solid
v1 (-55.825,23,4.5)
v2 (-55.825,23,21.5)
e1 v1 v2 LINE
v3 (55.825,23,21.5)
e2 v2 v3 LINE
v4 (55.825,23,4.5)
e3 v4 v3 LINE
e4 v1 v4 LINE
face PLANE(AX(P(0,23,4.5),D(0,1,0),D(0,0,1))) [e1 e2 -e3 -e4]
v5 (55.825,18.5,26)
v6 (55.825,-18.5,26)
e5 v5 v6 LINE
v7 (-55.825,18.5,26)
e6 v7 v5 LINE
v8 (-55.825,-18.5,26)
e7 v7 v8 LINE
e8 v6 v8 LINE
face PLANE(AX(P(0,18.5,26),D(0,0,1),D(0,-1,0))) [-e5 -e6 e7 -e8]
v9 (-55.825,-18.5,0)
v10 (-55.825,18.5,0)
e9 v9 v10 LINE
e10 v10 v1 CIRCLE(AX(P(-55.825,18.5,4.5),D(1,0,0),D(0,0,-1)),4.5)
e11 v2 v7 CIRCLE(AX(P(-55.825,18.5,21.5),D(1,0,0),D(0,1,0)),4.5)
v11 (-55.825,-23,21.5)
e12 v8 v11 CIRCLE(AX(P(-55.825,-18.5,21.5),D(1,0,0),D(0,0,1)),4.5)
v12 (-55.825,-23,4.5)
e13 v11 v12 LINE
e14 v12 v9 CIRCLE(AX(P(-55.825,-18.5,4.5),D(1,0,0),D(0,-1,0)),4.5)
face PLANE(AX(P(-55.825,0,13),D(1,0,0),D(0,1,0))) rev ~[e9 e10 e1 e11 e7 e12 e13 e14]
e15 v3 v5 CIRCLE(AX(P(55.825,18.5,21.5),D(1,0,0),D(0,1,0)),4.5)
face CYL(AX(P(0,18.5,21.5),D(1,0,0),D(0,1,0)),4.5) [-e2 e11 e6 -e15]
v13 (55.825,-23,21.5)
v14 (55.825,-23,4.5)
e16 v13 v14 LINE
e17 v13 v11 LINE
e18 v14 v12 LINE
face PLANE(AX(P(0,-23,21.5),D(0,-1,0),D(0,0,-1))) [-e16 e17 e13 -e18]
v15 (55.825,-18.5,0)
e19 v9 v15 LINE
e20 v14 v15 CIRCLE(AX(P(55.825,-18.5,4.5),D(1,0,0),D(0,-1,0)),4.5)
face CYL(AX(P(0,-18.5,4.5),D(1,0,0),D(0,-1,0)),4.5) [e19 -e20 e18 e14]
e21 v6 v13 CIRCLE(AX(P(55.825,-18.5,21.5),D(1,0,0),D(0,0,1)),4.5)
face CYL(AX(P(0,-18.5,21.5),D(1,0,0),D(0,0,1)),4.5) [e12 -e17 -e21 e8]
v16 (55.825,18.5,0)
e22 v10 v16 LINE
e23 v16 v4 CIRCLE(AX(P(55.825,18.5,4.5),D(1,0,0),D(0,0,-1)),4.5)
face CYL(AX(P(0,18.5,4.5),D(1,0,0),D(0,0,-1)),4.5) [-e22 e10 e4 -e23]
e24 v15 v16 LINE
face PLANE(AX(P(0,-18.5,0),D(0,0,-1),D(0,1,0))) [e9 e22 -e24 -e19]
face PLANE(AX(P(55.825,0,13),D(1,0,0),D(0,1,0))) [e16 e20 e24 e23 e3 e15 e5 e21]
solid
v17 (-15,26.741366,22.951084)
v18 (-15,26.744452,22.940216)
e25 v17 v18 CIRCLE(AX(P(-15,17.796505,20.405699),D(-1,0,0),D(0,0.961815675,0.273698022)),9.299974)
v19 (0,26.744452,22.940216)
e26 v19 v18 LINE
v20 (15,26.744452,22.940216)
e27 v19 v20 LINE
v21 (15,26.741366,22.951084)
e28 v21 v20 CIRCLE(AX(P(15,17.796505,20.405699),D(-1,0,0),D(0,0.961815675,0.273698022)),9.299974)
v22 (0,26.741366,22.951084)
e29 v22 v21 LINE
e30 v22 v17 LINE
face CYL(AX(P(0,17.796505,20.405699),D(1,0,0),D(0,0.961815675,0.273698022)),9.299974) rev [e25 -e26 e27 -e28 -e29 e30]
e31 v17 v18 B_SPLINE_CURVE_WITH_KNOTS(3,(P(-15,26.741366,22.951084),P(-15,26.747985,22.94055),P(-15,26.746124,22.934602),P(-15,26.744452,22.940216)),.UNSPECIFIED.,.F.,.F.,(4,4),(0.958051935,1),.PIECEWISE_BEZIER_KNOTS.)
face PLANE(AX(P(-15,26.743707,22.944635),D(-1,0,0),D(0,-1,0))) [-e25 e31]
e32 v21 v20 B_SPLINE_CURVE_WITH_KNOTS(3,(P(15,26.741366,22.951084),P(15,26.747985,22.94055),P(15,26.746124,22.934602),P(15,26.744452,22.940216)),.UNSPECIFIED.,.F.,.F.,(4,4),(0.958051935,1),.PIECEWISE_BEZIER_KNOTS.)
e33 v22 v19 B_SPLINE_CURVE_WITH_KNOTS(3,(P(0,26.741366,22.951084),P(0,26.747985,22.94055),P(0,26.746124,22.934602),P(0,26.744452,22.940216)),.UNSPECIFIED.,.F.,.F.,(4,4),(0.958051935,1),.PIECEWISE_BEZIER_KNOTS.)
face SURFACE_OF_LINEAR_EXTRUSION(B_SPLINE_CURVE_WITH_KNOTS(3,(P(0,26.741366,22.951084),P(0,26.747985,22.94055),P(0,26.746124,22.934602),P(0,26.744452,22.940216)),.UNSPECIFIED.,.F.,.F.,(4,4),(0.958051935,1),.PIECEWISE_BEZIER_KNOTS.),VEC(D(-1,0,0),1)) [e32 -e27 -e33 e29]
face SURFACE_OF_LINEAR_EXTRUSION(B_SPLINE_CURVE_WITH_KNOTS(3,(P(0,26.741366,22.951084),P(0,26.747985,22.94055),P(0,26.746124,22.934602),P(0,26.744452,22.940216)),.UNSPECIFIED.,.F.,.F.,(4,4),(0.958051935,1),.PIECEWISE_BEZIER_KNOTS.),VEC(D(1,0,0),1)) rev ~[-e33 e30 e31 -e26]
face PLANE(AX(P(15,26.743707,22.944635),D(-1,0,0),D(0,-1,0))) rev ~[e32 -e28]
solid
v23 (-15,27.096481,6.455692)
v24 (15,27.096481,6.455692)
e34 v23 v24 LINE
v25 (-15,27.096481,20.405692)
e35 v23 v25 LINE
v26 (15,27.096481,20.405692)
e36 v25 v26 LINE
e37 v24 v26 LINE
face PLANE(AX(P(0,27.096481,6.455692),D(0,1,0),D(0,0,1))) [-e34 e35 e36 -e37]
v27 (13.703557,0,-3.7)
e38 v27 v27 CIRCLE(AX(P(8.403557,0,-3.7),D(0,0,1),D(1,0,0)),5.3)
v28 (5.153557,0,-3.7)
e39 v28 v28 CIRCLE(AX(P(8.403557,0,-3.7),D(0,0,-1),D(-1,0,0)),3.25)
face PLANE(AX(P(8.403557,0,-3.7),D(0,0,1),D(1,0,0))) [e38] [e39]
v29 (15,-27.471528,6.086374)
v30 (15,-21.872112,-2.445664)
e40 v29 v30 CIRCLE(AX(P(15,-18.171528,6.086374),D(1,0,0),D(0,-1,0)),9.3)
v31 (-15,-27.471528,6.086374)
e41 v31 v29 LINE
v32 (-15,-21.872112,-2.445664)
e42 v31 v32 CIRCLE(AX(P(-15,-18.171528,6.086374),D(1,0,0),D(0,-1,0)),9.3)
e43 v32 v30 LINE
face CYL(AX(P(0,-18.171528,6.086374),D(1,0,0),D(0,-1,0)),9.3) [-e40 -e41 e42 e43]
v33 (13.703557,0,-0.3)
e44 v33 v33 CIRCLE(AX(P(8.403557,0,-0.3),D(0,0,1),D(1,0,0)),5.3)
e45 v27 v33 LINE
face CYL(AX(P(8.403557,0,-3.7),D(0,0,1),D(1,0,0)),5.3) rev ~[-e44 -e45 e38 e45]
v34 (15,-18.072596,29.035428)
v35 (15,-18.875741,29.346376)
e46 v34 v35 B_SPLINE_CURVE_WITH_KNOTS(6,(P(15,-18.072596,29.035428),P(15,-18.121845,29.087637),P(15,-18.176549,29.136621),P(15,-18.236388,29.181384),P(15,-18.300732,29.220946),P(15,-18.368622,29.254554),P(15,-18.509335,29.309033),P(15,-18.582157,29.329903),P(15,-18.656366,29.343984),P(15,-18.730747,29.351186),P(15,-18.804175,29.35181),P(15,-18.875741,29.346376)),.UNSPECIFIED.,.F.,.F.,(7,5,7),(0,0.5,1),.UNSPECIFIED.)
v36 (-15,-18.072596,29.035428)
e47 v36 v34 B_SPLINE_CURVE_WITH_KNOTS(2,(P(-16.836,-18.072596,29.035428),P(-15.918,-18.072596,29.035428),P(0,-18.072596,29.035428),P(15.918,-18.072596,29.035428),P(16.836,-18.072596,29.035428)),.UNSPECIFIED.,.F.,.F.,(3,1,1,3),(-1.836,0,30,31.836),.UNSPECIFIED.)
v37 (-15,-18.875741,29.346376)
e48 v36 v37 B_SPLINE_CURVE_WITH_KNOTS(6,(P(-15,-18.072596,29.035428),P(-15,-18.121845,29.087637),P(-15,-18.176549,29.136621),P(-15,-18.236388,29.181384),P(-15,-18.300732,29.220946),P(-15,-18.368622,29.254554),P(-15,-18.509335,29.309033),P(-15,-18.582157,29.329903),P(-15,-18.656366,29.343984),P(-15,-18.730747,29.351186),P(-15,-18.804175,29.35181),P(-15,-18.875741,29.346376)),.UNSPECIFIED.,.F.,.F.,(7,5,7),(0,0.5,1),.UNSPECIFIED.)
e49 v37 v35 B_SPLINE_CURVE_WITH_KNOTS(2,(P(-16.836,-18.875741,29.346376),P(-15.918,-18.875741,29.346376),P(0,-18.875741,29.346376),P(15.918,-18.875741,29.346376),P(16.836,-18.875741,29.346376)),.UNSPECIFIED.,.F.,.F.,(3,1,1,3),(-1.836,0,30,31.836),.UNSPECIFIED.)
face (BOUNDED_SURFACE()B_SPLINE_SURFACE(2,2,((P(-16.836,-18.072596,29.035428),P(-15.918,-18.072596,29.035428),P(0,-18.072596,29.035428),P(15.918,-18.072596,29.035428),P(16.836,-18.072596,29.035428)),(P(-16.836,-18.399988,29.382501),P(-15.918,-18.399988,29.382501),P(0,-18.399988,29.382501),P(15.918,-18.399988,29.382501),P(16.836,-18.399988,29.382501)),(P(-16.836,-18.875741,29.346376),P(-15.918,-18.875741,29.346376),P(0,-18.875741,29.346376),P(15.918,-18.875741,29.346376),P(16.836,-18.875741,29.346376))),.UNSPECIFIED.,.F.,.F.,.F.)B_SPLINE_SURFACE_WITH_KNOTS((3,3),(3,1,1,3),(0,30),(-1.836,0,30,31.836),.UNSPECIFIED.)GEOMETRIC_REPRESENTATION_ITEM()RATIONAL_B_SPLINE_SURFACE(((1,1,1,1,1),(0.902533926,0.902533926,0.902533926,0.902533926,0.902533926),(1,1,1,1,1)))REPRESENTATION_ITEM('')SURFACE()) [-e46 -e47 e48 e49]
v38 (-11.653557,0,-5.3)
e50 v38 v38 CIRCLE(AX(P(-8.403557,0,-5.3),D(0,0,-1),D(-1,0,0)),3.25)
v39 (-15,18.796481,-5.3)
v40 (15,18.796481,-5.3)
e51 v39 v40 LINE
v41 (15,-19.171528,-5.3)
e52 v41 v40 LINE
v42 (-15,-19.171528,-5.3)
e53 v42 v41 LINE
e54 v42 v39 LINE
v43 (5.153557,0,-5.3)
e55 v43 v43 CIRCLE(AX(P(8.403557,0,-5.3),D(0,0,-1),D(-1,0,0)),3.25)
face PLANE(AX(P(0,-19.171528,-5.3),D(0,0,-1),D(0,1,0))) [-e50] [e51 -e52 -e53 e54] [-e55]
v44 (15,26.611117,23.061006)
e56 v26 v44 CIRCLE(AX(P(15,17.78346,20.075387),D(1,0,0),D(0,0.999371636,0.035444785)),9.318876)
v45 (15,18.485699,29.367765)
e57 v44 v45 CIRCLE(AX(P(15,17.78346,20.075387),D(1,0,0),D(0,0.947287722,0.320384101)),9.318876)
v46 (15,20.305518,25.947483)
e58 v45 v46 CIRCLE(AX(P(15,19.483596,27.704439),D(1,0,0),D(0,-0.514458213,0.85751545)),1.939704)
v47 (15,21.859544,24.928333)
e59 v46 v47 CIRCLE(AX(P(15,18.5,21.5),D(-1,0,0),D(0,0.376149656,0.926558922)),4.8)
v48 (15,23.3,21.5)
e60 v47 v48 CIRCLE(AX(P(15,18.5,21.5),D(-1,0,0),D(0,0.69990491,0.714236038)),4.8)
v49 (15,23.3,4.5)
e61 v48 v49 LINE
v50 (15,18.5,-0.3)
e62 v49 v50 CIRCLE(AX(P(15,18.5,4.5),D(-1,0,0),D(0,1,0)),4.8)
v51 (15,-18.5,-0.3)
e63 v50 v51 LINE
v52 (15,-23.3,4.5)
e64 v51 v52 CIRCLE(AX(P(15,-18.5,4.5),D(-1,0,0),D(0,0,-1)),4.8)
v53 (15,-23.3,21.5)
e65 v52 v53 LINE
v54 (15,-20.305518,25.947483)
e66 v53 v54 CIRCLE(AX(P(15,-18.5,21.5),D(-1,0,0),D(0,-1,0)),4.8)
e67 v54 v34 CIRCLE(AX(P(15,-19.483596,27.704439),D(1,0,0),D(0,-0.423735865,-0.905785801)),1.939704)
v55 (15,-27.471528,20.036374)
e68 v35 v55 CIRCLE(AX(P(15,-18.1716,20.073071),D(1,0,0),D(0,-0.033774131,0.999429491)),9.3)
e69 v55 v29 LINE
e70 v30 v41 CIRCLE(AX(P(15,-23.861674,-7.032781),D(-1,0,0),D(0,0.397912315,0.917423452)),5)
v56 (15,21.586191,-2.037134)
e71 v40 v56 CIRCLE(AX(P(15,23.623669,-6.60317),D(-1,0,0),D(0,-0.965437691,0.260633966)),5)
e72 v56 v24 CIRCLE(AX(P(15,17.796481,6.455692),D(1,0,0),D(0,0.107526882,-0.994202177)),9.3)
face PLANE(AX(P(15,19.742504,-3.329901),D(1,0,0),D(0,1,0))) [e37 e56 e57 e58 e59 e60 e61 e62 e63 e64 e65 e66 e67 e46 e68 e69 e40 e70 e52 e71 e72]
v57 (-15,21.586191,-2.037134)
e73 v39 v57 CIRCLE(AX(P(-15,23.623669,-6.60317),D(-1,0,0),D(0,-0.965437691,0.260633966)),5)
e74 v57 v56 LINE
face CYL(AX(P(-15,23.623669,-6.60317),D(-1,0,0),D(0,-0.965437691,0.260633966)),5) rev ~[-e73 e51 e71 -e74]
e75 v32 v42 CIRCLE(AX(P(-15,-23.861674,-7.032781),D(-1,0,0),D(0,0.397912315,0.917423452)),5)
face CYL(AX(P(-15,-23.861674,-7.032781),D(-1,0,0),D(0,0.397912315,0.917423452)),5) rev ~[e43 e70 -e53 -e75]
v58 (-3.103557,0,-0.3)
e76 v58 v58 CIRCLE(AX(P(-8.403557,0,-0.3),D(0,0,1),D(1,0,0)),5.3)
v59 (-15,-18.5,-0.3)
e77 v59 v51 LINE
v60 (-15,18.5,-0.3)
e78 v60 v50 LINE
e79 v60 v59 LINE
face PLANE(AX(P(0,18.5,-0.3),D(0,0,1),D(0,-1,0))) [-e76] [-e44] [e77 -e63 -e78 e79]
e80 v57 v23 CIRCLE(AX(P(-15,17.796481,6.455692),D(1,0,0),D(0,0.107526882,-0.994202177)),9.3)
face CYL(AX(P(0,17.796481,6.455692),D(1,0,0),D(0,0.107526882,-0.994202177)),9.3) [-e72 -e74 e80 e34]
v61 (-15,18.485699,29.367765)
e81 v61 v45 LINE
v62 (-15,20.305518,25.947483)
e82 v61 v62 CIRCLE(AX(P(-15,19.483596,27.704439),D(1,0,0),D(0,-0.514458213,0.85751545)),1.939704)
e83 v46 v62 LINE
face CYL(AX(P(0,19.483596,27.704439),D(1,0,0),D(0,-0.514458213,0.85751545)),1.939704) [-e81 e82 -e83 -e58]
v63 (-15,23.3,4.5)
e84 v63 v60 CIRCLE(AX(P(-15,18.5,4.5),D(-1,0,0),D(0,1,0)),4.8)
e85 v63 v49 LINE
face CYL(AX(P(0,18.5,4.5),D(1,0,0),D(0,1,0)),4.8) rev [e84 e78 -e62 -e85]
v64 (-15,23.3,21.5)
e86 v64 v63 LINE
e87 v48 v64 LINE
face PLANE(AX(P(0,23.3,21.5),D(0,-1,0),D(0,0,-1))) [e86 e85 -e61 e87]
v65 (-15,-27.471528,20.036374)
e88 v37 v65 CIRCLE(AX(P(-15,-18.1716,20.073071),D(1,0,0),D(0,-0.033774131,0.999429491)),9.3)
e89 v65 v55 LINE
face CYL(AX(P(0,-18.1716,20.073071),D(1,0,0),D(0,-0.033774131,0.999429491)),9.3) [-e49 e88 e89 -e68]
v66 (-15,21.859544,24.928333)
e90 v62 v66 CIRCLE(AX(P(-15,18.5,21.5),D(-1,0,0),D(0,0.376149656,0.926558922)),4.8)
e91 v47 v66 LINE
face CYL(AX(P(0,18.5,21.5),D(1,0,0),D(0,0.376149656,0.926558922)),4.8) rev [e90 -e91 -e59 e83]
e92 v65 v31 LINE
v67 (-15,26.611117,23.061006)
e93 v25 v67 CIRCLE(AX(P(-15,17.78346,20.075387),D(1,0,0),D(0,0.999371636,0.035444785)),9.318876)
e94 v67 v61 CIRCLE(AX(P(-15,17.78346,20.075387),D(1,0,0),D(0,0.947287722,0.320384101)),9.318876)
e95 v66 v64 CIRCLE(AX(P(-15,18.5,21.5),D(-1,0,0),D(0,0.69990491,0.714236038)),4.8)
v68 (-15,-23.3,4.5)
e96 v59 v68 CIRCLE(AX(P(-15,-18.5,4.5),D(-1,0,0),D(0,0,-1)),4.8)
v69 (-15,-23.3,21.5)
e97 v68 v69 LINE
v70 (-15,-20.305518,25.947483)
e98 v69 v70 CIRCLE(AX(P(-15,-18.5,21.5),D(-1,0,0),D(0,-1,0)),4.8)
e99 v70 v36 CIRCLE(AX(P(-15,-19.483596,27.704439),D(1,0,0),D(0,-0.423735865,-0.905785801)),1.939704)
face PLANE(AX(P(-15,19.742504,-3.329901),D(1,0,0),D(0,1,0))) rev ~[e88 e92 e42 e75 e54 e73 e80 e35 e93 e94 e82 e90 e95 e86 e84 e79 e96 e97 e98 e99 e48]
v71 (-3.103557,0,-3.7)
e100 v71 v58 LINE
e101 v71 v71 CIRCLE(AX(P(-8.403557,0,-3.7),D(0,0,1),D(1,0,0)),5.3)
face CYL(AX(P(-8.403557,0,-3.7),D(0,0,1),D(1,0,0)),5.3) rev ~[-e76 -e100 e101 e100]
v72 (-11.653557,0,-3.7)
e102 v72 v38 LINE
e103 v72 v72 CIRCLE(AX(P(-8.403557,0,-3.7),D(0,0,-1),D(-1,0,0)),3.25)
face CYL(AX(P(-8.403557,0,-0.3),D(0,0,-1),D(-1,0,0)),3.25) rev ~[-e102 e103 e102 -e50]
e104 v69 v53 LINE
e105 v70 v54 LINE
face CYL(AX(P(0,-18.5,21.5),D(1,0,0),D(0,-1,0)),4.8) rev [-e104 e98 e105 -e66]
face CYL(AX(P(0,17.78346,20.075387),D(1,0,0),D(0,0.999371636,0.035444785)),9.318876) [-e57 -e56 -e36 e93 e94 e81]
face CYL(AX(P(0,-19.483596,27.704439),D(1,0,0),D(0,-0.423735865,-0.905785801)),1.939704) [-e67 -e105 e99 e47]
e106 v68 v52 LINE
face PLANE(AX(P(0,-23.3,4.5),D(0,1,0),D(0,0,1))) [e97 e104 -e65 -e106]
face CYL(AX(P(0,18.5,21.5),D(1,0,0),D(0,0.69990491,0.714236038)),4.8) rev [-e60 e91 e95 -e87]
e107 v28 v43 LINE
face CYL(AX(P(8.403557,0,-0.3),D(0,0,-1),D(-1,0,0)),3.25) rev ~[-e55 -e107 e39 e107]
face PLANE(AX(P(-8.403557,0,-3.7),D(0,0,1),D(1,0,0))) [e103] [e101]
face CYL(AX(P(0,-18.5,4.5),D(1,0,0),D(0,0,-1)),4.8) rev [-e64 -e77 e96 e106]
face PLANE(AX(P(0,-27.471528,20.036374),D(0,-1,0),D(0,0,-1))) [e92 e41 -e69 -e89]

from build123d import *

# Parameters (mm, degrees)
F1_DEPTH       = 55.825
F3_DEPTH       = 15
F5_D           = 6.5
F5_CBORE_D     = 10.6
F5_CBORE_DEPTH = 3.4
F6_T1_DEPTH    = 30
F7_R           = 1


# Not quite as in the source:
# - a fillet or chamfer that OpenCascade refuses, or shapes differently, is made with other operations: its cross-section is extruded or revolved along the edge and cut away or added


with BuildPart() as f1:
    # F0 (on Right) → F1 (new body, symmetric)
    with BuildSketch(Plane.YZ):
        with BuildLine():
            ThreePointArc((-23, 4.5), (-21.6819805153, 1.3180194847), (-18.5, 0))
            Line((-18.5, 0), (18.5, 0))
            ThreePointArc((18.5, 0), (21.6819805153, 1.3180194847), (23, 4.5))
            Line((23, 4.5), (23, 21.5))
            ThreePointArc((23, 21.5), (21.6819805153, 24.6819805153), (18.5, 26))
            Line((18.5, 26), (-18.5, 26))
            ThreePointArc((-18.5, 26), (-21.6819805153, 24.6819805153), (-23, 21.5))
            Line((-23, 21.5), (-23, 4.5))
        make_face()
    extrude(amount=F1_DEPTH, both=True)


with BuildPart() as f3:
    # F2 (on Right) → F3 (new body, symmetric)
    with BuildSketch(Plane.YZ):
        with BuildLine():
            add(Edge.make_bspline(
                [(26.7413663264, 22.9510836938), (26.7479851877, 22.9405500746), (26.746124128, 22.9346023266), (26.7444516472, 22.9402163477)],
                knots=[0.9580519354, 0.9580519354, 0.9580519354, 0.9580519354, 1, 1, 1, 1], degree=3))
            ThreePointArc((26.7413663264, 22.9510836938), (26.7429106369, 22.9456504892), (26.7444516472, 22.9402163477))
        make_face()
    extrude(amount=F3_DEPTH, both=True)


with BuildPart() as f3b:
    # F2 (on Right) → F3, piece 2 (new body, symmetric)
    with BuildSketch(Plane.YZ):
        with BuildLine():
            Line((23.3, 21.5), (23.3, 4.5))
            ThreePointArc((23.3, 4.5), (21.8941125497, 1.1058874503), (18.5, -0.3))
            Line((18.5, -0.3), (-18.5, -0.3))
            ThreePointArc((-18.5, -0.3), (-21.8941125497, 1.1058874503), (-23.3, 4.5))
            Line((-23.3, 4.5), (-23.3, 21.5))
            ThreePointArc((-23.3, 21.5), (-22.4816132456, 24.1808125563), (-20.3055183491, 25.9474828264))
            ThreePointArc((-20.3055183491, 25.9474828264), (-17.7711928448, 26.7933262745), (-18.4856994576, 29.3677654758))
            ThreePointArc((-18.4856994576, 29.3677654758), (-24.8705621503, 26.5239553831), (-27.4715276401, 20.0363744805))
            Line((-27.4715276401, 20.0363744805), (-27.4715276401, 6.0863744805))
            ThreePointArc((-27.4715276401, 6.0863744805), (-25.0921489995, -0.126112944), (-19.1715276401, -3.1597057701))
            Line((-19.1715276401, -3.1597057701), (-19.1715276401, -5.3))
            Line((-19.1715276401, -5.3), (18.7964805483, -5.3))
            Line((18.7964805483, -5.3), (18.7964805483, -2.7903881607))
            ThreePointArc((18.7964805483, -2.7903881607), (24.7171019077, 0.2432046654), (27.0964805483, 6.4556920899))
            Line((27.0964805483, 6.4556920899), (27.0964805483, 20.4056920899))
            ThreePointArc((27.0964805483, 20.4056920899), (26.9504507259, 21.7510160985), (26.6111170191, 23.0610061873))
            add(Edge.make_bspline(
                [(21.8595435659, 24.928332981), (23.3056451816, 24.9760065601), (25.9834803549, 23.5080012929), (26.6111170191, 23.0610061873)],
                knots=[0.1665026568, 0.1665026568, 0.1665026568, 0.1665026568, 0.8763222388, 0.8763222388, 0.8763222388, 0.8763222388], degree=3))
            ThreePointArc((21.8595435659, 24.928332981), (22.9252575697, 23.3593266097), (23.3, 21.5))
        make_face()
        with BuildLine():
            ThreePointArc((20.3055183491, 25.9474828264), (21.1323245903, 25.5138344823), (21.8595435659, 24.928332981))
            add(Edge.make_bspline(
                [(21.8595435659, 24.928332981), (23.3056451816, 24.9760065601), (25.9834803549, 23.5080012929), (26.6111170191, 23.0610061873)],
                knots=[0.1665026568, 0.1665026568, 0.1665026568, 0.1665026568, 0.8763222388, 0.8763222388, 0.8763222388, 0.8763222388], degree=3))
            ThreePointArc((26.6111170191, 23.0610061873), (23.4973497148, 27.4369702659), (18.4856994576, 29.3677654758))
            ThreePointArc((18.4856994576, 29.3677654758), (17.7711928448, 26.7933262745), (20.3055183491, 25.9474828264))
        make_face()
    extrude(amount=F3_DEPTH, both=True)

    # F5 (through all)
    with Locations(Plane.XY.offset(-0.3)):
        with Locations((-8.4035573527, 0), (8.4035573527, 0)):
            CounterBoreHole(F5_D / 2, F5_CBORE_D / 2, F5_CBORE_DEPTH)

    # F6: fillet of radius 5 on 2 edges, made by hand

    # F6_s2 → F6_t1 (join)
    with BuildSketch(Plane.YZ.offset(-15)):
        with BuildLine():
            ThreePointArc((18.7964805483, -5.3), (19.8233418664, -3.3539370541), (21.5861905231, -2.0371341951))
            ThreePointArc((21.5861905231, -2.0371341951), (20.2207697833, -2.522772239), (18.7964805483, -2.7903881607))
            Line((18.7964805483, -2.7903881607), (18.7964805483, -5.3))
        make_face()
        with BuildLine():
            ThreePointArc((-21.8721121654, -2.4456636213), (-20.2296725429, -3.5964212779), (-19.1715276401, -5.3))
            Line((-19.1715276401, -5.3), (-19.1715276401, -3.1597057701))
            ThreePointArc((-19.1715276401, -3.1597057701), (-20.5487818898, -2.9046578425), (-21.8721121654, -2.4456636213))
        make_face()
    extrude(amount=F6_T1_DEPTH)

    # F7
    f7_edges = [f3b.edges().sort_by_distance(p)[0] for p in [
        (0, -18.485699, 29.367765),
    ]]
    fillet(f7_edges, radius=F7_R)


solid = Compound([f1.part, f3.part, f3b.part])
